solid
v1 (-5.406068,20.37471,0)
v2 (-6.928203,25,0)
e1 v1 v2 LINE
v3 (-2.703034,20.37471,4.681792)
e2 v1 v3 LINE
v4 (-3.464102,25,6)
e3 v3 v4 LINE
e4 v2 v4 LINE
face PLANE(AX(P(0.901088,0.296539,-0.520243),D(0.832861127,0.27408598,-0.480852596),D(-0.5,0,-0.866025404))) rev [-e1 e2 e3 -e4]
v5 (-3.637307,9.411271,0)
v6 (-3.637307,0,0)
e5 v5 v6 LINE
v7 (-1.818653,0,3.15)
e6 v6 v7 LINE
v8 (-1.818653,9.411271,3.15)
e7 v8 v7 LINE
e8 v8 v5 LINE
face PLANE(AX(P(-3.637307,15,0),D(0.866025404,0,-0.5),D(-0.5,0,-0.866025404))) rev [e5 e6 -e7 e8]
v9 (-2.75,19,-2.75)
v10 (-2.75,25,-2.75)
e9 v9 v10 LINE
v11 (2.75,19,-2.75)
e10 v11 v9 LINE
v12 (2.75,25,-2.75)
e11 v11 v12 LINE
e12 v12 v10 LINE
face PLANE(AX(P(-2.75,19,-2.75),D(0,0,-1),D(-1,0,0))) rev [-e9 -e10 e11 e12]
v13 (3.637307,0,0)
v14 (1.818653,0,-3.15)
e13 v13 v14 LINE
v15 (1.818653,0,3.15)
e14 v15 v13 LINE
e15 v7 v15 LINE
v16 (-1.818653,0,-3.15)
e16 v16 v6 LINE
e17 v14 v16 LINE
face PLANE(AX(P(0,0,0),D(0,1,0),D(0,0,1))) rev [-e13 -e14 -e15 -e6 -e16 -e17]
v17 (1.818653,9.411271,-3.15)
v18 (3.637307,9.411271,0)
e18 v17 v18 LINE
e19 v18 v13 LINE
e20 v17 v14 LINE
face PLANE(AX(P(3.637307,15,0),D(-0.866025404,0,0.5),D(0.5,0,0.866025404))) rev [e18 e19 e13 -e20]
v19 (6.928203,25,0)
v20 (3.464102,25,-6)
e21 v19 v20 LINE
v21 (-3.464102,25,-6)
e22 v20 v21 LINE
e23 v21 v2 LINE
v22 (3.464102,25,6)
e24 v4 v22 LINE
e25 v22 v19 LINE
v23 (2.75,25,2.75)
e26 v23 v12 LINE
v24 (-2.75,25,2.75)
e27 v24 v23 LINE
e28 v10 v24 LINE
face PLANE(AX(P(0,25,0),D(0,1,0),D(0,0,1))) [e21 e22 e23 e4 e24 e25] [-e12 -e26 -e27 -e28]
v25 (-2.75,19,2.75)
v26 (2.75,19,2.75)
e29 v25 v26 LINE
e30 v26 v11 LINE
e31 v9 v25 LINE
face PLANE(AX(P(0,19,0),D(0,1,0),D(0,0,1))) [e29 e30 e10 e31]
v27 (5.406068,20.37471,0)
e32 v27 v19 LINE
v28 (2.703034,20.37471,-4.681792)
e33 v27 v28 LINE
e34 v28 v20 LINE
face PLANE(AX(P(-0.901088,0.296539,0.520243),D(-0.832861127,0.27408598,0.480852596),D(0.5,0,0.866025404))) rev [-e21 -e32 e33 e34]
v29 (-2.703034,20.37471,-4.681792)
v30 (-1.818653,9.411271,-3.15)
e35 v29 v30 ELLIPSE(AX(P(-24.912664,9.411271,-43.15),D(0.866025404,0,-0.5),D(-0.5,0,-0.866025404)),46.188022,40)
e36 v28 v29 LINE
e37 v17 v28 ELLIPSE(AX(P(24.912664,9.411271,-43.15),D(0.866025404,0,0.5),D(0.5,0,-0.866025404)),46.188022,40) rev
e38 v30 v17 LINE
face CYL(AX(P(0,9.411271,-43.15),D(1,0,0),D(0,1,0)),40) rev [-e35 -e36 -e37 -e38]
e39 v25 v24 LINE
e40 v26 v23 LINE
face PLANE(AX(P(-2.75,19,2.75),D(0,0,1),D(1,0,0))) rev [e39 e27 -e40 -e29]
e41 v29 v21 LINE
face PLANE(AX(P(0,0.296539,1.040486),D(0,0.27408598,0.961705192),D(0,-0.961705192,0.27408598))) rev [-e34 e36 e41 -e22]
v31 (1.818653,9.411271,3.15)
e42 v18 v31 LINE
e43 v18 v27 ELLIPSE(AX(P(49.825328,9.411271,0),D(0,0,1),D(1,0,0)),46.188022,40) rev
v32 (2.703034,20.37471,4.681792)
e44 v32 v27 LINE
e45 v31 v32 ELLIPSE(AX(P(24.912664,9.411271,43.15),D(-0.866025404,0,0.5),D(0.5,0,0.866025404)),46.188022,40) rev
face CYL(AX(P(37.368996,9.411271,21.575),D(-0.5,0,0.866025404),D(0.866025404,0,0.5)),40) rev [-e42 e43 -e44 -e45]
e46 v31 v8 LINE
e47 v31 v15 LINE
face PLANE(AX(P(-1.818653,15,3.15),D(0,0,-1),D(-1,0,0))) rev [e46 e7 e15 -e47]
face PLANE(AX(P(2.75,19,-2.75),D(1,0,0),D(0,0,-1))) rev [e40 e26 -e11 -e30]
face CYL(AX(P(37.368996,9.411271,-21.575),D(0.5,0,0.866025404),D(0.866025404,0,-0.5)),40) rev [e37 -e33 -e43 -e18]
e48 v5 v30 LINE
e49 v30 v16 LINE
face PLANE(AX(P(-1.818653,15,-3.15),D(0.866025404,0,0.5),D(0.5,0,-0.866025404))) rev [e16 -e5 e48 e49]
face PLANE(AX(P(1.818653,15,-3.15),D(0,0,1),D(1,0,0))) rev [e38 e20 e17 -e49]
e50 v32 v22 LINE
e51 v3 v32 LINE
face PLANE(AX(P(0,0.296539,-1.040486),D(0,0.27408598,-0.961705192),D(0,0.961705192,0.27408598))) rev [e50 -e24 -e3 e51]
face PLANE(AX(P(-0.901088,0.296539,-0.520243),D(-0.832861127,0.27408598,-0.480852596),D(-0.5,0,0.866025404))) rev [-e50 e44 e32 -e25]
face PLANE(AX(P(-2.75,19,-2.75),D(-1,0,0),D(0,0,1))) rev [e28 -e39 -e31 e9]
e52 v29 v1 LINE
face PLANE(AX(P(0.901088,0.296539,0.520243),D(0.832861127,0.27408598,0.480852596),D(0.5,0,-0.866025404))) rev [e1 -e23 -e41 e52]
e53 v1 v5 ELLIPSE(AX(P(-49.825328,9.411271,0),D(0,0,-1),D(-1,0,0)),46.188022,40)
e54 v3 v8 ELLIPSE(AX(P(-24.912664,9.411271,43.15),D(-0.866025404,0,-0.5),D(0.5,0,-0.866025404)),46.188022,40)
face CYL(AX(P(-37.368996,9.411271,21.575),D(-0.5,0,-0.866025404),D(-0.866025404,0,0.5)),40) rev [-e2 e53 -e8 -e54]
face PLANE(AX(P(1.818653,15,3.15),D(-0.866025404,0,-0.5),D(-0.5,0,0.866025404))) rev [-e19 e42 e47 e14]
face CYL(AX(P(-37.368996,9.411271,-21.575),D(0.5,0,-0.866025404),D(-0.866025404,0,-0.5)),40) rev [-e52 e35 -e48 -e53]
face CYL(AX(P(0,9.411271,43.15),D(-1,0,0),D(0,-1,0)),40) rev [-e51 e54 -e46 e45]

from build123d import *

# Parameters (mm, degrees)
BOSS_EXTRU_1_DEPTH      = 15
ESQUISSE4_W             = 5.5
ESQUISSE4_H             = 5.5
ENL_V_MAT_EXTRU_1_DEPTH = 6
CONG_2_R                = 40


with BuildPart() as part:
    # Esquisse1 → Boss.-Extru.1 (new body)
    with BuildSketch(Plane(origin=(0, 0, 0), x_dir=(1, 0, 0), z_dir=(0, 1, 0))):
        Polygon((1.818653348, -3.15), (3.637306696, 0), (1.818653348, 3.15), (-1.818653348, 3.15), (-3.637306696, 0), (-1.818653348, -3.15), align=None)
    extrude(amount=BOSS_EXTRU_1_DEPTH)

    # Esquisse3 → section 1 of lissage1
    with BuildSketch(Plane(origin=(0, 25, 0), x_dir=(1, 0, 0), z_dir=(0, 1, 0)), mode=Mode.PRIVATE) as lissage1_s1:
        with BuildLine():
            Line((3.464101615, -6), (6.92820323, 0))
            Line((6.92820323, 0), (3.464101615, 6))
            Line((3.464101615, 6), (-3.464101615, 6))
            Line((-3.464101615, 6), (-6.92820323, 0))
            Line((-6.92820323, 0), (-3.464101615, -6))
            Line((-3.464101615, -6), (3.464101615, -6))
        make_face()
    # loft from a face of the part (lissage1)
    loft([part.faces().sort_by_distance((0, 15, 0))[0], lissage1_s1.sketch])

    # Esquisse4 → Enlèv. mat.-Extru.1 (cut)
    with BuildSketch(Plane(origin=(0, 25, 0), x_dir=(1, 0, 0), z_dir=(0, 1, 0))):
        Rectangle(ESQUISSE4_W, ESQUISSE4_H)
    extrude(amount=-ENL_V_MAT_EXTRU_1_DEPTH, mode=Mode.SUBTRACT)

    # Congé2
    # the kernel refuses this fillet: 40 mm, written as the material it adds along each edge
    with BuildSketch(Plane(origin=(-15.790476474, 15, 3.15), x_dir=(0, -1, 0), z_dir=(1, 0, 0))) as cong_2_piece_1_section:
        with BuildLine():
            CenterArc((CONG_2_R * 0.139718231259, -CONG_2_R), CONG_2_R, 90, 15.907551931)
            Line((-CONG_2_R * 0.134367748379, -CONG_2_R * 0.0382948082879), (0, 0))
            Line((0, 0), (CONG_2_R * 0.139718231259, 0))
        make_face()
    cong_2_piece_1 = extrude(amount=31.580952948, mode=Mode.PRIVATE)
    cong_2_piece_1 = cong_2_piece_1 - Plane(origin=(-39.952625281, 9.41127075, 17.100023118), x_dir=(0.8660254037844387, 0, -0.5000000000000001), z_dir=(-0.5000000000000001, 0, -0.8660254037844387)) * Cylinder(40, 86, mode=Mode.PRIVATE)
    cong_2_piece_1 = cong_2_piece_1 - Plane(origin=(32.057387044, 9.41127075, 30.774976882), x_dir=(-0.8660254037844385, 0, -0.5000000000000003), z_dir=(-0.5000000000000003, 0, 0.8660254037844385)) * Cylinder(40, 86, mode=Mode.PRIVATE)
    add(cong_2_piece_1)
    with BuildSketch(Plane(origin=(-5.167258215, 15, 15.249953764), x_dir=(0, -1, 0), z_dir=(0.5000000000000003, 0, -0.8660254037844385))) as cong_2_piece_2_section:
        with BuildLine():
            CenterArc((CONG_2_R * 0.139718231259, -CONG_2_R), CONG_2_R, 90, 15.907551931)
            Line((-CONG_2_R * 0.134367748379, -CONG_2_R * 0.0382948082879), (0, 0))
            Line((0, 0), (CONG_2_R * 0.139718231259, 0))
        make_face()
    cong_2_piece_2 = extrude(amount=31.580952948, mode=Mode.PRIVATE)
    cong_2_piece_2 = cong_2_piece_2 - Plane(origin=(42.680605303, 9.41127075, -12.375023118), x_dir=(-0.8660254037844388, 0, 0.4999999999999999), z_dir=(0.4999999999999999, 0, 0.8660254037844388)) * Cylinder(40, 86, mode=Mode.PRIVATE)
    cong_2_piece_2 = cong_2_piece_2 - Plane(origin=(-5.167258215, 9.41127075, 43.15), x_dir=(0, 0, -1), z_dir=(-1, 0, 0)) * Cylinder(40, 86, mode=Mode.PRIVATE)
    add(cong_2_piece_2)
    with BuildSketch(Plane(origin=(10.623218259, 15, 12.099953764), x_dir=(0, -1, 0), z_dir=(-0.49999999999999994, 0, -0.8660254037844388))) as cong_2_piece_3_section:
        with BuildLine():
            CenterArc((CONG_2_R * 0.139718231259, -CONG_2_R), CONG_2_R, 90, 15.907551931)
            Line((-CONG_2_R * 0.134367748379, -CONG_2_R * 0.0382948082879), (0, 0))
            Line((0, 0), (CONG_2_R * 0.139718231259, 0))
        make_face()
    cong_2_piece_3 = extrude(amount=31.580952948, mode=Mode.PRIVATE)
    cong_2_piece_3 = cong_2_piece_3 - Plane(origin=(34.785367066, 9.41127075, 26.049976882), x_dir=(-0.8660254037844385, 0, -0.5000000000000003), z_dir=(-0.5000000000000003, 0, 0.8660254037844385)) * Cylinder(40, 86, mode=Mode.PRIVATE)
    cong_2_piece_3 = cong_2_piece_3 - Plane(origin=(10.623218259, 9.41127075, -43.15), x_dir=(0, 0, 1), z_dir=(1, 0, 0)) * Cylinder(40, 86, mode=Mode.PRIVATE)
    add(cong_2_piece_3)
    with BuildSketch(Plane(origin=(15.790476474, 15, -3.15), x_dir=(0, -1, 0), z_dir=(-1, 0, 0))) as cong_2_piece_4_section:
        with BuildLine():
            CenterArc((CONG_2_R * 0.139718231259, -CONG_2_R), CONG_2_R, 90, 15.907551931)
            Line((-CONG_2_R * 0.134367748379, -CONG_2_R * 0.0382948082879), (0, 0))
            Line((0, 0), (CONG_2_R * 0.139718231259, 0))
        make_face()
    cong_2_piece_4 = extrude(amount=31.580952948, mode=Mode.PRIVATE)
    cong_2_piece_4 = cong_2_piece_4 - Plane(origin=(-32.057387044, 9.41127075, -30.774976882), x_dir=(0.8660254037844385, 0, 0.5000000000000002), z_dir=(0.5000000000000003, 0, -0.8660254037844386)) * Cylinder(40, 86, mode=Mode.PRIVATE)
    cong_2_piece_4 = cong_2_piece_4 - Plane(origin=(39.952625281, 9.41127075, -17.100023118), x_dir=(-0.8660254037844388, 0, 0.4999999999999999), z_dir=(0.4999999999999999, 0, 0.8660254037844388)) * Cylinder(40, 86, mode=Mode.PRIVATE)
    add(cong_2_piece_4)
    with BuildSketch(Plane(origin=(5.167258215, 15, -15.249953764), x_dir=(0, -1, 0), z_dir=(-0.5000000000000003, 0, 0.8660254037844386))) as cong_2_piece_5_section:
        with BuildLine():
            CenterArc((CONG_2_R * 0.139718231259, -CONG_2_R), CONG_2_R, 90, 15.907551931)
            Line((-CONG_2_R * 0.134367748379, -CONG_2_R * 0.0382948082879), (0, 0))
            Line((0, 0), (CONG_2_R * 0.139718231259, 0))
        make_face()
    cong_2_piece_5 = extrude(amount=31.580952948, mode=Mode.PRIVATE)
    cong_2_piece_5 = cong_2_piece_5 - Plane(origin=(-42.680605303, 9.41127075, 12.375023118), x_dir=(0.8660254037844387, 0, -0.5000000000000001), z_dir=(-0.5000000000000001, 0, -0.8660254037844387)) * Cylinder(40, 86, mode=Mode.PRIVATE)
    cong_2_piece_5 = cong_2_piece_5 - Plane(origin=(5.167258215, 9.41127075, -43.15), x_dir=(0, 0, 1), z_dir=(1, 0, 0)) * Cylinder(40, 86, mode=Mode.PRIVATE)
    add(cong_2_piece_5)
    with BuildSketch(Plane(origin=(-10.623218259, 15, -12.099953764), x_dir=(0, -1, 0), z_dir=(0.5000000000000001, 0, 0.8660254037844387))) as cong_2_piece_6_section:
        with BuildLine():
            CenterArc((CONG_2_R * 0.139718231259, -CONG_2_R), CONG_2_R, 90, 15.907551931)
            Line((-CONG_2_R * 0.134367748379, -CONG_2_R * 0.0382948082879), (0, 0))
            Line((0, 0), (CONG_2_R * 0.139718231259, 0))
        make_face()
    cong_2_piece_6 = extrude(amount=31.580952948, mode=Mode.PRIVATE)
    cong_2_piece_6 = cong_2_piece_6 - Plane(origin=(-34.785367066, 9.41127075, -26.049976882), x_dir=(0.8660254037844385, 0, 0.5000000000000002), z_dir=(0.5000000000000003, 0, -0.8660254037844386)) * Cylinder(40, 86, mode=Mode.PRIVATE)
    cong_2_piece_6 = cong_2_piece_6 - Plane(origin=(-10.623218259, 9.41127075, 43.15), x_dir=(0, 0, -1), z_dir=(-1, 0, 0)) * Cylinder(40, 86, mode=Mode.PRIVATE)
    add(cong_2_piece_6)


solid = part.part
